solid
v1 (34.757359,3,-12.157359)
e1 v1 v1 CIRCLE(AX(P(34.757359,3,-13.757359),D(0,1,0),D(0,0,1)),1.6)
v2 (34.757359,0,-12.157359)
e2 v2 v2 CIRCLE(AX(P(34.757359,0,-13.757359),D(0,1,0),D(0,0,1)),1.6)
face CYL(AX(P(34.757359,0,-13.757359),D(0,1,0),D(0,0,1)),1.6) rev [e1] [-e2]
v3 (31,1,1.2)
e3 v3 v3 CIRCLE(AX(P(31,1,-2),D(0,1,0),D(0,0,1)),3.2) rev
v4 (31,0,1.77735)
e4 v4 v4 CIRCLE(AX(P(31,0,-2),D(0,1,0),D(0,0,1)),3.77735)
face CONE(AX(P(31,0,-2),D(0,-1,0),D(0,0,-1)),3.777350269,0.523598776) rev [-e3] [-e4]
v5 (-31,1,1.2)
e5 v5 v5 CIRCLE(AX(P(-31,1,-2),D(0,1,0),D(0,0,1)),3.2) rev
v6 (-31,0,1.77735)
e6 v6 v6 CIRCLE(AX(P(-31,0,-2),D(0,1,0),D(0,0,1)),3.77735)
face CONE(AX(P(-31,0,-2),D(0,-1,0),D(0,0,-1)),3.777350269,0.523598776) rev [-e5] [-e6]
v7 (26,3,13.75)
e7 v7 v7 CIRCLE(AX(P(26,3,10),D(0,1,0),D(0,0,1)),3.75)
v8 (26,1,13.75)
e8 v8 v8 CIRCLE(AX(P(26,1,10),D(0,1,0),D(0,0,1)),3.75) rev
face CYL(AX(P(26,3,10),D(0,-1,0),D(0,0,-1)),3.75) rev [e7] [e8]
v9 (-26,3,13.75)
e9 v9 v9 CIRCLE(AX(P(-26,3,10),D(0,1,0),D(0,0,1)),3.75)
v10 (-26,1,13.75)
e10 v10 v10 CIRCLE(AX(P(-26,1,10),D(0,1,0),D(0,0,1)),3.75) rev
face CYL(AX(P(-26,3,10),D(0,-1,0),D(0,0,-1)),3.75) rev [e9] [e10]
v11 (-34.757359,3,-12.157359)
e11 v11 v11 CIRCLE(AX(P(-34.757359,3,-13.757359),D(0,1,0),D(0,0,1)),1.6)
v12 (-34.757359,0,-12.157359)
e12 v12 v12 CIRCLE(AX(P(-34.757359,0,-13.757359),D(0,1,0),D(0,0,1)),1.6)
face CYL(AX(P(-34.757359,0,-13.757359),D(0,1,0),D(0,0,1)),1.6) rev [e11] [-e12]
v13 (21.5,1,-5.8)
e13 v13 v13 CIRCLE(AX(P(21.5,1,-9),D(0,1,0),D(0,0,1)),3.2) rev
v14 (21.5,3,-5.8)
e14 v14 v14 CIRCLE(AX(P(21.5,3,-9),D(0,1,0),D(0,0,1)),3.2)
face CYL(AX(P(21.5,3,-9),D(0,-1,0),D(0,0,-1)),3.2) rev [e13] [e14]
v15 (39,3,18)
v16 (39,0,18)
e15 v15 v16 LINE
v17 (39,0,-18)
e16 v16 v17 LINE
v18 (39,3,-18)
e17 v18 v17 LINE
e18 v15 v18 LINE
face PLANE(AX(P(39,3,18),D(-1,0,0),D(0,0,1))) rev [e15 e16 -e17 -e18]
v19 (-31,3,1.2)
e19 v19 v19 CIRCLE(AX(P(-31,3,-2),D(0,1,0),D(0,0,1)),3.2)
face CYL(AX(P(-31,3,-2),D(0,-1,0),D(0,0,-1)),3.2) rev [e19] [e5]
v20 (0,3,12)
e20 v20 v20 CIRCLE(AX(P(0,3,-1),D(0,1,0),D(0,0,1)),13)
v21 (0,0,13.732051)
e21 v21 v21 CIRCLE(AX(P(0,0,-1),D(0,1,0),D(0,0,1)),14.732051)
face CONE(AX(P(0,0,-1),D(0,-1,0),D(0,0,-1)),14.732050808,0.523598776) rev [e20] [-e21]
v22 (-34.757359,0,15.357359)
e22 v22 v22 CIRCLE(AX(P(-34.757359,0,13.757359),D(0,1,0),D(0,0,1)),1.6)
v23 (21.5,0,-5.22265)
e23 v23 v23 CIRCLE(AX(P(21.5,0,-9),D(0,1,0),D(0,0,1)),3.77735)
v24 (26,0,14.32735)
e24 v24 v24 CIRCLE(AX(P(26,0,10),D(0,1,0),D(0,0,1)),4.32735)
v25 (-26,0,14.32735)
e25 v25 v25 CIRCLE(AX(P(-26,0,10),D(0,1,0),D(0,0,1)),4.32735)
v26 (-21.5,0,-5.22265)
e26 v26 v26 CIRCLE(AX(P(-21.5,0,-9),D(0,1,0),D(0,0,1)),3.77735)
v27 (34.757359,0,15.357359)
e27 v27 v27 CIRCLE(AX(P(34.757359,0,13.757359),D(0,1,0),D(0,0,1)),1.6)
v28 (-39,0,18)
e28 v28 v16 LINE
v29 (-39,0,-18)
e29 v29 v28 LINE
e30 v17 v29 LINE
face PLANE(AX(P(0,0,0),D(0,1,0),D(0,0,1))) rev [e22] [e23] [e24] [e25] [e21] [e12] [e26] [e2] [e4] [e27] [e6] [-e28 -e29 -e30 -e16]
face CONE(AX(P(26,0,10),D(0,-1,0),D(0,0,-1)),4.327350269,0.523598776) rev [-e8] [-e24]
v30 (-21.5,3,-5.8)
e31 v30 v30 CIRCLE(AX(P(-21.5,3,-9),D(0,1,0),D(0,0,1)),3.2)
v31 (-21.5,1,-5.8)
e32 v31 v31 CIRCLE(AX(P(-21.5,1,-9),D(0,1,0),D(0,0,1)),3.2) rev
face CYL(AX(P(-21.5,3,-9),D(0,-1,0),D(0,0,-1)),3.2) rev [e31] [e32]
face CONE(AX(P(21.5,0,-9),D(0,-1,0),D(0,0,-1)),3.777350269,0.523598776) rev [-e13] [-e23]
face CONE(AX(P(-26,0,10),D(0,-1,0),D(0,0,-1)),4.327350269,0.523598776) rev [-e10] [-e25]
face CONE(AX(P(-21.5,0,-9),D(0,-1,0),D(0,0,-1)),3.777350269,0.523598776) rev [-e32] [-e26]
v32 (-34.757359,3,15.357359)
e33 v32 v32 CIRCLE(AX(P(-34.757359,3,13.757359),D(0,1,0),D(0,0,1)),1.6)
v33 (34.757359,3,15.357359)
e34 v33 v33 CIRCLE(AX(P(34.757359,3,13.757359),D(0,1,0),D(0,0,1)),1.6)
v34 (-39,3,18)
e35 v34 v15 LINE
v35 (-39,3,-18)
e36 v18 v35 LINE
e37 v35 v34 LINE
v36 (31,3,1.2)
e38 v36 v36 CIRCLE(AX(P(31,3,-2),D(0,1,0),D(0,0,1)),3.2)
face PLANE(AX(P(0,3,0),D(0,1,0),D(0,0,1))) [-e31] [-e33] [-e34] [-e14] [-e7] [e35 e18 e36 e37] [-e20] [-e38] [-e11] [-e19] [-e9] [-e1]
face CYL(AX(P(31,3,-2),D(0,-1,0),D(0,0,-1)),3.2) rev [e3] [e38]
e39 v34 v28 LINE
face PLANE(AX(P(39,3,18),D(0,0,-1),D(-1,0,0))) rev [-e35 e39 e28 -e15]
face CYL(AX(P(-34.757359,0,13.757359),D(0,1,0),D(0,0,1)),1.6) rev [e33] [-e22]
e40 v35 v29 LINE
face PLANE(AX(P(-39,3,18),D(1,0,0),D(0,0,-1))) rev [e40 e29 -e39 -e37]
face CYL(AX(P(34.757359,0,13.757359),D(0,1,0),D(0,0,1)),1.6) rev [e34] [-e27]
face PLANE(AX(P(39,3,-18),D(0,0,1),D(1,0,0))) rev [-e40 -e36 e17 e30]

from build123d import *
from OCP.BRepFilletAPI import BRepFilletAPI_MakeChamfer

# Parameters (mm, degrees)
SKETCH1_W           = 78
SKETCH1_H           = 36
SKETCH1_R           = 13
SKETCH1_R_2         = 3.2
SKETCH1_R_3         = 3.75
BOSS_EXTRUDE1_DEPTH = 3
CHAMFER1_SIZE2      = 1.732050808
CHAMFER1_SIZE       = 3
CHAMFER2_SIZE       = 1
CHAMFER2_SIZE2      = 0.577350269
SKETCH2_R           = 1.6
CUT_EXTRUDE1_DEPTH  = 44.058100283


with BuildPart() as part:
    # Sketch1 → Boss-Extrude1 (new body)
    with BuildSketch(Plane(origin=(0, 0, 0), x_dir=(1, 0, 0), z_dir=(0, 1, 0))):
        Rectangle(SKETCH1_W, SKETCH1_H)
        with Locations(Location((0, 1, 0), (0, 0, 270))):
            Circle(SKETCH1_R, mode=Mode.SUBTRACT)
        with Locations(Location((-31, 2, 0), (0, 0, 270))):
            Circle(SKETCH1_R_2, mode=Mode.SUBTRACT)
        with Locations(Location((-26, -10, 0), (0, 0, 270))):
            Circle(SKETCH1_R_3, mode=Mode.SUBTRACT)
        with Locations(Location((31, 2, 0), (0, 0, 270))):
            Circle(SKETCH1_R_2, mode=Mode.SUBTRACT)
        with Locations(Location((26, -10, 0), (0, 0, 270))):
            Circle(SKETCH1_R_3, mode=Mode.SUBTRACT)
        with Locations(Location((21.5, 9, 0), (0, 0, 270))):
            Circle(SKETCH1_R_2, mode=Mode.SUBTRACT)
        with Locations(Location((-21.5, 9, 0), (0, 0, 270))):
            Circle(SKETCH1_R_2, mode=Mode.SUBTRACT)
    extrude(amount=BOSS_EXTRUDE1_DEPTH)

    # Chamfer1
    chamfer1_edges = [part.edges().sort_by_distance(p)[0] for p in [
        (0, 0, -14),
    ]]
    chamfer1_side = [part.faces().sort_by_distance(p)[0] for p in [
        (0, 0.034641016, -14),
    ]]
    chamfer(chamfer1_edges, length=CHAMFER1_SIZE - 0.0001, length2=CHAMFER1_SIZE2 - 0.0001, reference=chamfer1_side[0])  # a hair under: the kernel refuses the full size

    # Chamfer2: one chamfer whose edges measure the first distance from different faces: ONE call of the kernel's chamfer builder (chamfer() names one face for all edges)
    chamfer2_edges_1 = [part.edges().sort_by_distance(p)[0] for p in [
        (-31, 0, -5.2),
    ]]
    chamfer2_side_1 = [part.faces().sort_by_distance(p)[0] for p in [
        (-31, 1.5, -5.2),
    ]]
    chamfer2_edges_2 = [part.edges().sort_by_distance(p)[0] for p in [
        (-26, 0, 6.25),
    ]]
    chamfer2_side_2 = [part.faces().sort_by_distance(p)[0] for p in [
        (-26, 1.5, 6.25),
    ]]
    chamfer2_edges_3 = [part.edges().sort_by_distance(p)[0] for p in [
        (31, 0, -5.2),
    ]]
    chamfer2_side_3 = [part.faces().sort_by_distance(p)[0] for p in [
        (31, 1.5, -5.2),
    ]]
    chamfer2_edges_4 = [part.edges().sort_by_distance(p)[0] for p in [
        (26, 0, 6.25),
    ]]
    chamfer2_side_4 = [part.faces().sort_by_distance(p)[0] for p in [
        (26, 1.5, 6.25),
    ]]
    chamfer2_edges_5 = [part.edges().sort_by_distance(p)[0] for p in [
        (21.5, 0, -12.2),
    ]]
    chamfer2_side_5 = [part.faces().sort_by_distance(p)[0] for p in [
        (21.5, 1.5, -12.2),
    ]]
    chamfer2_edges_6 = [part.edges().sort_by_distance(p)[0] for p in [
        (-21.5, 0, -12.2),
    ]]
    chamfer2_side_6 = [part.faces().sort_by_distance(p)[0] for p in [
        (-21.5, 1.5, -12.2),
    ]]
    chamfer2 = BRepFilletAPI_MakeChamfer(part.part.solid().wrapped)
    for e in chamfer2_edges_1:
        chamfer2.Add(CHAMFER2_SIZE, CHAMFER2_SIZE2, e.wrapped, chamfer2_side_1[0].wrapped)  # the first distance lies on this face
    for e in chamfer2_edges_2:
        chamfer2.Add(CHAMFER2_SIZE, CHAMFER2_SIZE2, e.wrapped, chamfer2_side_2[0].wrapped)  # the first distance lies on this face
    for e in chamfer2_edges_3:
        chamfer2.Add(CHAMFER2_SIZE, CHAMFER2_SIZE2, e.wrapped, chamfer2_side_3[0].wrapped)  # the first distance lies on this face
    for e in chamfer2_edges_4:
        chamfer2.Add(CHAMFER2_SIZE, CHAMFER2_SIZE2, e.wrapped, chamfer2_side_4[0].wrapped)  # the first distance lies on this face
    for e in chamfer2_edges_5:
        chamfer2.Add(CHAMFER2_SIZE, CHAMFER2_SIZE2, e.wrapped, chamfer2_side_5[0].wrapped)  # the first distance lies on this face
    for e in chamfer2_edges_6:
        chamfer2.Add(CHAMFER2_SIZE, CHAMFER2_SIZE2, e.wrapped, chamfer2_side_6[0].wrapped)  # the first distance lies on this face
    add(Compound.cast(chamfer2.Shape()), mode=Mode.REPLACE)

    # Sketch2 → Cut-Extrude1 (cut, through all)
    with BuildSketch(Plane(origin=(0, 3, 0), x_dir=(1, 0, 0), z_dir=(0, 1, 0))):
        with Locations(Location((-34.757359313, -13.757359313, 0), (0, 0, 270))):
            Circle(SKETCH2_R)
        with Locations(Location((-34.757359313, 13.757359313, 0), (0, 0, 270))):
            Circle(SKETCH2_R)
        with Locations(Location((34.757359313, 13.757359313, 0), (0, 0, 270))):
            Circle(SKETCH2_R)
        with Locations(Location((34.757359313, -13.757359313, 0), (0, 0, 270))):
            Circle(SKETCH2_R)
    extrude(amount=-CUT_EXTRUDE1_DEPTH, mode=Mode.SUBTRACT)


solid = part.part
